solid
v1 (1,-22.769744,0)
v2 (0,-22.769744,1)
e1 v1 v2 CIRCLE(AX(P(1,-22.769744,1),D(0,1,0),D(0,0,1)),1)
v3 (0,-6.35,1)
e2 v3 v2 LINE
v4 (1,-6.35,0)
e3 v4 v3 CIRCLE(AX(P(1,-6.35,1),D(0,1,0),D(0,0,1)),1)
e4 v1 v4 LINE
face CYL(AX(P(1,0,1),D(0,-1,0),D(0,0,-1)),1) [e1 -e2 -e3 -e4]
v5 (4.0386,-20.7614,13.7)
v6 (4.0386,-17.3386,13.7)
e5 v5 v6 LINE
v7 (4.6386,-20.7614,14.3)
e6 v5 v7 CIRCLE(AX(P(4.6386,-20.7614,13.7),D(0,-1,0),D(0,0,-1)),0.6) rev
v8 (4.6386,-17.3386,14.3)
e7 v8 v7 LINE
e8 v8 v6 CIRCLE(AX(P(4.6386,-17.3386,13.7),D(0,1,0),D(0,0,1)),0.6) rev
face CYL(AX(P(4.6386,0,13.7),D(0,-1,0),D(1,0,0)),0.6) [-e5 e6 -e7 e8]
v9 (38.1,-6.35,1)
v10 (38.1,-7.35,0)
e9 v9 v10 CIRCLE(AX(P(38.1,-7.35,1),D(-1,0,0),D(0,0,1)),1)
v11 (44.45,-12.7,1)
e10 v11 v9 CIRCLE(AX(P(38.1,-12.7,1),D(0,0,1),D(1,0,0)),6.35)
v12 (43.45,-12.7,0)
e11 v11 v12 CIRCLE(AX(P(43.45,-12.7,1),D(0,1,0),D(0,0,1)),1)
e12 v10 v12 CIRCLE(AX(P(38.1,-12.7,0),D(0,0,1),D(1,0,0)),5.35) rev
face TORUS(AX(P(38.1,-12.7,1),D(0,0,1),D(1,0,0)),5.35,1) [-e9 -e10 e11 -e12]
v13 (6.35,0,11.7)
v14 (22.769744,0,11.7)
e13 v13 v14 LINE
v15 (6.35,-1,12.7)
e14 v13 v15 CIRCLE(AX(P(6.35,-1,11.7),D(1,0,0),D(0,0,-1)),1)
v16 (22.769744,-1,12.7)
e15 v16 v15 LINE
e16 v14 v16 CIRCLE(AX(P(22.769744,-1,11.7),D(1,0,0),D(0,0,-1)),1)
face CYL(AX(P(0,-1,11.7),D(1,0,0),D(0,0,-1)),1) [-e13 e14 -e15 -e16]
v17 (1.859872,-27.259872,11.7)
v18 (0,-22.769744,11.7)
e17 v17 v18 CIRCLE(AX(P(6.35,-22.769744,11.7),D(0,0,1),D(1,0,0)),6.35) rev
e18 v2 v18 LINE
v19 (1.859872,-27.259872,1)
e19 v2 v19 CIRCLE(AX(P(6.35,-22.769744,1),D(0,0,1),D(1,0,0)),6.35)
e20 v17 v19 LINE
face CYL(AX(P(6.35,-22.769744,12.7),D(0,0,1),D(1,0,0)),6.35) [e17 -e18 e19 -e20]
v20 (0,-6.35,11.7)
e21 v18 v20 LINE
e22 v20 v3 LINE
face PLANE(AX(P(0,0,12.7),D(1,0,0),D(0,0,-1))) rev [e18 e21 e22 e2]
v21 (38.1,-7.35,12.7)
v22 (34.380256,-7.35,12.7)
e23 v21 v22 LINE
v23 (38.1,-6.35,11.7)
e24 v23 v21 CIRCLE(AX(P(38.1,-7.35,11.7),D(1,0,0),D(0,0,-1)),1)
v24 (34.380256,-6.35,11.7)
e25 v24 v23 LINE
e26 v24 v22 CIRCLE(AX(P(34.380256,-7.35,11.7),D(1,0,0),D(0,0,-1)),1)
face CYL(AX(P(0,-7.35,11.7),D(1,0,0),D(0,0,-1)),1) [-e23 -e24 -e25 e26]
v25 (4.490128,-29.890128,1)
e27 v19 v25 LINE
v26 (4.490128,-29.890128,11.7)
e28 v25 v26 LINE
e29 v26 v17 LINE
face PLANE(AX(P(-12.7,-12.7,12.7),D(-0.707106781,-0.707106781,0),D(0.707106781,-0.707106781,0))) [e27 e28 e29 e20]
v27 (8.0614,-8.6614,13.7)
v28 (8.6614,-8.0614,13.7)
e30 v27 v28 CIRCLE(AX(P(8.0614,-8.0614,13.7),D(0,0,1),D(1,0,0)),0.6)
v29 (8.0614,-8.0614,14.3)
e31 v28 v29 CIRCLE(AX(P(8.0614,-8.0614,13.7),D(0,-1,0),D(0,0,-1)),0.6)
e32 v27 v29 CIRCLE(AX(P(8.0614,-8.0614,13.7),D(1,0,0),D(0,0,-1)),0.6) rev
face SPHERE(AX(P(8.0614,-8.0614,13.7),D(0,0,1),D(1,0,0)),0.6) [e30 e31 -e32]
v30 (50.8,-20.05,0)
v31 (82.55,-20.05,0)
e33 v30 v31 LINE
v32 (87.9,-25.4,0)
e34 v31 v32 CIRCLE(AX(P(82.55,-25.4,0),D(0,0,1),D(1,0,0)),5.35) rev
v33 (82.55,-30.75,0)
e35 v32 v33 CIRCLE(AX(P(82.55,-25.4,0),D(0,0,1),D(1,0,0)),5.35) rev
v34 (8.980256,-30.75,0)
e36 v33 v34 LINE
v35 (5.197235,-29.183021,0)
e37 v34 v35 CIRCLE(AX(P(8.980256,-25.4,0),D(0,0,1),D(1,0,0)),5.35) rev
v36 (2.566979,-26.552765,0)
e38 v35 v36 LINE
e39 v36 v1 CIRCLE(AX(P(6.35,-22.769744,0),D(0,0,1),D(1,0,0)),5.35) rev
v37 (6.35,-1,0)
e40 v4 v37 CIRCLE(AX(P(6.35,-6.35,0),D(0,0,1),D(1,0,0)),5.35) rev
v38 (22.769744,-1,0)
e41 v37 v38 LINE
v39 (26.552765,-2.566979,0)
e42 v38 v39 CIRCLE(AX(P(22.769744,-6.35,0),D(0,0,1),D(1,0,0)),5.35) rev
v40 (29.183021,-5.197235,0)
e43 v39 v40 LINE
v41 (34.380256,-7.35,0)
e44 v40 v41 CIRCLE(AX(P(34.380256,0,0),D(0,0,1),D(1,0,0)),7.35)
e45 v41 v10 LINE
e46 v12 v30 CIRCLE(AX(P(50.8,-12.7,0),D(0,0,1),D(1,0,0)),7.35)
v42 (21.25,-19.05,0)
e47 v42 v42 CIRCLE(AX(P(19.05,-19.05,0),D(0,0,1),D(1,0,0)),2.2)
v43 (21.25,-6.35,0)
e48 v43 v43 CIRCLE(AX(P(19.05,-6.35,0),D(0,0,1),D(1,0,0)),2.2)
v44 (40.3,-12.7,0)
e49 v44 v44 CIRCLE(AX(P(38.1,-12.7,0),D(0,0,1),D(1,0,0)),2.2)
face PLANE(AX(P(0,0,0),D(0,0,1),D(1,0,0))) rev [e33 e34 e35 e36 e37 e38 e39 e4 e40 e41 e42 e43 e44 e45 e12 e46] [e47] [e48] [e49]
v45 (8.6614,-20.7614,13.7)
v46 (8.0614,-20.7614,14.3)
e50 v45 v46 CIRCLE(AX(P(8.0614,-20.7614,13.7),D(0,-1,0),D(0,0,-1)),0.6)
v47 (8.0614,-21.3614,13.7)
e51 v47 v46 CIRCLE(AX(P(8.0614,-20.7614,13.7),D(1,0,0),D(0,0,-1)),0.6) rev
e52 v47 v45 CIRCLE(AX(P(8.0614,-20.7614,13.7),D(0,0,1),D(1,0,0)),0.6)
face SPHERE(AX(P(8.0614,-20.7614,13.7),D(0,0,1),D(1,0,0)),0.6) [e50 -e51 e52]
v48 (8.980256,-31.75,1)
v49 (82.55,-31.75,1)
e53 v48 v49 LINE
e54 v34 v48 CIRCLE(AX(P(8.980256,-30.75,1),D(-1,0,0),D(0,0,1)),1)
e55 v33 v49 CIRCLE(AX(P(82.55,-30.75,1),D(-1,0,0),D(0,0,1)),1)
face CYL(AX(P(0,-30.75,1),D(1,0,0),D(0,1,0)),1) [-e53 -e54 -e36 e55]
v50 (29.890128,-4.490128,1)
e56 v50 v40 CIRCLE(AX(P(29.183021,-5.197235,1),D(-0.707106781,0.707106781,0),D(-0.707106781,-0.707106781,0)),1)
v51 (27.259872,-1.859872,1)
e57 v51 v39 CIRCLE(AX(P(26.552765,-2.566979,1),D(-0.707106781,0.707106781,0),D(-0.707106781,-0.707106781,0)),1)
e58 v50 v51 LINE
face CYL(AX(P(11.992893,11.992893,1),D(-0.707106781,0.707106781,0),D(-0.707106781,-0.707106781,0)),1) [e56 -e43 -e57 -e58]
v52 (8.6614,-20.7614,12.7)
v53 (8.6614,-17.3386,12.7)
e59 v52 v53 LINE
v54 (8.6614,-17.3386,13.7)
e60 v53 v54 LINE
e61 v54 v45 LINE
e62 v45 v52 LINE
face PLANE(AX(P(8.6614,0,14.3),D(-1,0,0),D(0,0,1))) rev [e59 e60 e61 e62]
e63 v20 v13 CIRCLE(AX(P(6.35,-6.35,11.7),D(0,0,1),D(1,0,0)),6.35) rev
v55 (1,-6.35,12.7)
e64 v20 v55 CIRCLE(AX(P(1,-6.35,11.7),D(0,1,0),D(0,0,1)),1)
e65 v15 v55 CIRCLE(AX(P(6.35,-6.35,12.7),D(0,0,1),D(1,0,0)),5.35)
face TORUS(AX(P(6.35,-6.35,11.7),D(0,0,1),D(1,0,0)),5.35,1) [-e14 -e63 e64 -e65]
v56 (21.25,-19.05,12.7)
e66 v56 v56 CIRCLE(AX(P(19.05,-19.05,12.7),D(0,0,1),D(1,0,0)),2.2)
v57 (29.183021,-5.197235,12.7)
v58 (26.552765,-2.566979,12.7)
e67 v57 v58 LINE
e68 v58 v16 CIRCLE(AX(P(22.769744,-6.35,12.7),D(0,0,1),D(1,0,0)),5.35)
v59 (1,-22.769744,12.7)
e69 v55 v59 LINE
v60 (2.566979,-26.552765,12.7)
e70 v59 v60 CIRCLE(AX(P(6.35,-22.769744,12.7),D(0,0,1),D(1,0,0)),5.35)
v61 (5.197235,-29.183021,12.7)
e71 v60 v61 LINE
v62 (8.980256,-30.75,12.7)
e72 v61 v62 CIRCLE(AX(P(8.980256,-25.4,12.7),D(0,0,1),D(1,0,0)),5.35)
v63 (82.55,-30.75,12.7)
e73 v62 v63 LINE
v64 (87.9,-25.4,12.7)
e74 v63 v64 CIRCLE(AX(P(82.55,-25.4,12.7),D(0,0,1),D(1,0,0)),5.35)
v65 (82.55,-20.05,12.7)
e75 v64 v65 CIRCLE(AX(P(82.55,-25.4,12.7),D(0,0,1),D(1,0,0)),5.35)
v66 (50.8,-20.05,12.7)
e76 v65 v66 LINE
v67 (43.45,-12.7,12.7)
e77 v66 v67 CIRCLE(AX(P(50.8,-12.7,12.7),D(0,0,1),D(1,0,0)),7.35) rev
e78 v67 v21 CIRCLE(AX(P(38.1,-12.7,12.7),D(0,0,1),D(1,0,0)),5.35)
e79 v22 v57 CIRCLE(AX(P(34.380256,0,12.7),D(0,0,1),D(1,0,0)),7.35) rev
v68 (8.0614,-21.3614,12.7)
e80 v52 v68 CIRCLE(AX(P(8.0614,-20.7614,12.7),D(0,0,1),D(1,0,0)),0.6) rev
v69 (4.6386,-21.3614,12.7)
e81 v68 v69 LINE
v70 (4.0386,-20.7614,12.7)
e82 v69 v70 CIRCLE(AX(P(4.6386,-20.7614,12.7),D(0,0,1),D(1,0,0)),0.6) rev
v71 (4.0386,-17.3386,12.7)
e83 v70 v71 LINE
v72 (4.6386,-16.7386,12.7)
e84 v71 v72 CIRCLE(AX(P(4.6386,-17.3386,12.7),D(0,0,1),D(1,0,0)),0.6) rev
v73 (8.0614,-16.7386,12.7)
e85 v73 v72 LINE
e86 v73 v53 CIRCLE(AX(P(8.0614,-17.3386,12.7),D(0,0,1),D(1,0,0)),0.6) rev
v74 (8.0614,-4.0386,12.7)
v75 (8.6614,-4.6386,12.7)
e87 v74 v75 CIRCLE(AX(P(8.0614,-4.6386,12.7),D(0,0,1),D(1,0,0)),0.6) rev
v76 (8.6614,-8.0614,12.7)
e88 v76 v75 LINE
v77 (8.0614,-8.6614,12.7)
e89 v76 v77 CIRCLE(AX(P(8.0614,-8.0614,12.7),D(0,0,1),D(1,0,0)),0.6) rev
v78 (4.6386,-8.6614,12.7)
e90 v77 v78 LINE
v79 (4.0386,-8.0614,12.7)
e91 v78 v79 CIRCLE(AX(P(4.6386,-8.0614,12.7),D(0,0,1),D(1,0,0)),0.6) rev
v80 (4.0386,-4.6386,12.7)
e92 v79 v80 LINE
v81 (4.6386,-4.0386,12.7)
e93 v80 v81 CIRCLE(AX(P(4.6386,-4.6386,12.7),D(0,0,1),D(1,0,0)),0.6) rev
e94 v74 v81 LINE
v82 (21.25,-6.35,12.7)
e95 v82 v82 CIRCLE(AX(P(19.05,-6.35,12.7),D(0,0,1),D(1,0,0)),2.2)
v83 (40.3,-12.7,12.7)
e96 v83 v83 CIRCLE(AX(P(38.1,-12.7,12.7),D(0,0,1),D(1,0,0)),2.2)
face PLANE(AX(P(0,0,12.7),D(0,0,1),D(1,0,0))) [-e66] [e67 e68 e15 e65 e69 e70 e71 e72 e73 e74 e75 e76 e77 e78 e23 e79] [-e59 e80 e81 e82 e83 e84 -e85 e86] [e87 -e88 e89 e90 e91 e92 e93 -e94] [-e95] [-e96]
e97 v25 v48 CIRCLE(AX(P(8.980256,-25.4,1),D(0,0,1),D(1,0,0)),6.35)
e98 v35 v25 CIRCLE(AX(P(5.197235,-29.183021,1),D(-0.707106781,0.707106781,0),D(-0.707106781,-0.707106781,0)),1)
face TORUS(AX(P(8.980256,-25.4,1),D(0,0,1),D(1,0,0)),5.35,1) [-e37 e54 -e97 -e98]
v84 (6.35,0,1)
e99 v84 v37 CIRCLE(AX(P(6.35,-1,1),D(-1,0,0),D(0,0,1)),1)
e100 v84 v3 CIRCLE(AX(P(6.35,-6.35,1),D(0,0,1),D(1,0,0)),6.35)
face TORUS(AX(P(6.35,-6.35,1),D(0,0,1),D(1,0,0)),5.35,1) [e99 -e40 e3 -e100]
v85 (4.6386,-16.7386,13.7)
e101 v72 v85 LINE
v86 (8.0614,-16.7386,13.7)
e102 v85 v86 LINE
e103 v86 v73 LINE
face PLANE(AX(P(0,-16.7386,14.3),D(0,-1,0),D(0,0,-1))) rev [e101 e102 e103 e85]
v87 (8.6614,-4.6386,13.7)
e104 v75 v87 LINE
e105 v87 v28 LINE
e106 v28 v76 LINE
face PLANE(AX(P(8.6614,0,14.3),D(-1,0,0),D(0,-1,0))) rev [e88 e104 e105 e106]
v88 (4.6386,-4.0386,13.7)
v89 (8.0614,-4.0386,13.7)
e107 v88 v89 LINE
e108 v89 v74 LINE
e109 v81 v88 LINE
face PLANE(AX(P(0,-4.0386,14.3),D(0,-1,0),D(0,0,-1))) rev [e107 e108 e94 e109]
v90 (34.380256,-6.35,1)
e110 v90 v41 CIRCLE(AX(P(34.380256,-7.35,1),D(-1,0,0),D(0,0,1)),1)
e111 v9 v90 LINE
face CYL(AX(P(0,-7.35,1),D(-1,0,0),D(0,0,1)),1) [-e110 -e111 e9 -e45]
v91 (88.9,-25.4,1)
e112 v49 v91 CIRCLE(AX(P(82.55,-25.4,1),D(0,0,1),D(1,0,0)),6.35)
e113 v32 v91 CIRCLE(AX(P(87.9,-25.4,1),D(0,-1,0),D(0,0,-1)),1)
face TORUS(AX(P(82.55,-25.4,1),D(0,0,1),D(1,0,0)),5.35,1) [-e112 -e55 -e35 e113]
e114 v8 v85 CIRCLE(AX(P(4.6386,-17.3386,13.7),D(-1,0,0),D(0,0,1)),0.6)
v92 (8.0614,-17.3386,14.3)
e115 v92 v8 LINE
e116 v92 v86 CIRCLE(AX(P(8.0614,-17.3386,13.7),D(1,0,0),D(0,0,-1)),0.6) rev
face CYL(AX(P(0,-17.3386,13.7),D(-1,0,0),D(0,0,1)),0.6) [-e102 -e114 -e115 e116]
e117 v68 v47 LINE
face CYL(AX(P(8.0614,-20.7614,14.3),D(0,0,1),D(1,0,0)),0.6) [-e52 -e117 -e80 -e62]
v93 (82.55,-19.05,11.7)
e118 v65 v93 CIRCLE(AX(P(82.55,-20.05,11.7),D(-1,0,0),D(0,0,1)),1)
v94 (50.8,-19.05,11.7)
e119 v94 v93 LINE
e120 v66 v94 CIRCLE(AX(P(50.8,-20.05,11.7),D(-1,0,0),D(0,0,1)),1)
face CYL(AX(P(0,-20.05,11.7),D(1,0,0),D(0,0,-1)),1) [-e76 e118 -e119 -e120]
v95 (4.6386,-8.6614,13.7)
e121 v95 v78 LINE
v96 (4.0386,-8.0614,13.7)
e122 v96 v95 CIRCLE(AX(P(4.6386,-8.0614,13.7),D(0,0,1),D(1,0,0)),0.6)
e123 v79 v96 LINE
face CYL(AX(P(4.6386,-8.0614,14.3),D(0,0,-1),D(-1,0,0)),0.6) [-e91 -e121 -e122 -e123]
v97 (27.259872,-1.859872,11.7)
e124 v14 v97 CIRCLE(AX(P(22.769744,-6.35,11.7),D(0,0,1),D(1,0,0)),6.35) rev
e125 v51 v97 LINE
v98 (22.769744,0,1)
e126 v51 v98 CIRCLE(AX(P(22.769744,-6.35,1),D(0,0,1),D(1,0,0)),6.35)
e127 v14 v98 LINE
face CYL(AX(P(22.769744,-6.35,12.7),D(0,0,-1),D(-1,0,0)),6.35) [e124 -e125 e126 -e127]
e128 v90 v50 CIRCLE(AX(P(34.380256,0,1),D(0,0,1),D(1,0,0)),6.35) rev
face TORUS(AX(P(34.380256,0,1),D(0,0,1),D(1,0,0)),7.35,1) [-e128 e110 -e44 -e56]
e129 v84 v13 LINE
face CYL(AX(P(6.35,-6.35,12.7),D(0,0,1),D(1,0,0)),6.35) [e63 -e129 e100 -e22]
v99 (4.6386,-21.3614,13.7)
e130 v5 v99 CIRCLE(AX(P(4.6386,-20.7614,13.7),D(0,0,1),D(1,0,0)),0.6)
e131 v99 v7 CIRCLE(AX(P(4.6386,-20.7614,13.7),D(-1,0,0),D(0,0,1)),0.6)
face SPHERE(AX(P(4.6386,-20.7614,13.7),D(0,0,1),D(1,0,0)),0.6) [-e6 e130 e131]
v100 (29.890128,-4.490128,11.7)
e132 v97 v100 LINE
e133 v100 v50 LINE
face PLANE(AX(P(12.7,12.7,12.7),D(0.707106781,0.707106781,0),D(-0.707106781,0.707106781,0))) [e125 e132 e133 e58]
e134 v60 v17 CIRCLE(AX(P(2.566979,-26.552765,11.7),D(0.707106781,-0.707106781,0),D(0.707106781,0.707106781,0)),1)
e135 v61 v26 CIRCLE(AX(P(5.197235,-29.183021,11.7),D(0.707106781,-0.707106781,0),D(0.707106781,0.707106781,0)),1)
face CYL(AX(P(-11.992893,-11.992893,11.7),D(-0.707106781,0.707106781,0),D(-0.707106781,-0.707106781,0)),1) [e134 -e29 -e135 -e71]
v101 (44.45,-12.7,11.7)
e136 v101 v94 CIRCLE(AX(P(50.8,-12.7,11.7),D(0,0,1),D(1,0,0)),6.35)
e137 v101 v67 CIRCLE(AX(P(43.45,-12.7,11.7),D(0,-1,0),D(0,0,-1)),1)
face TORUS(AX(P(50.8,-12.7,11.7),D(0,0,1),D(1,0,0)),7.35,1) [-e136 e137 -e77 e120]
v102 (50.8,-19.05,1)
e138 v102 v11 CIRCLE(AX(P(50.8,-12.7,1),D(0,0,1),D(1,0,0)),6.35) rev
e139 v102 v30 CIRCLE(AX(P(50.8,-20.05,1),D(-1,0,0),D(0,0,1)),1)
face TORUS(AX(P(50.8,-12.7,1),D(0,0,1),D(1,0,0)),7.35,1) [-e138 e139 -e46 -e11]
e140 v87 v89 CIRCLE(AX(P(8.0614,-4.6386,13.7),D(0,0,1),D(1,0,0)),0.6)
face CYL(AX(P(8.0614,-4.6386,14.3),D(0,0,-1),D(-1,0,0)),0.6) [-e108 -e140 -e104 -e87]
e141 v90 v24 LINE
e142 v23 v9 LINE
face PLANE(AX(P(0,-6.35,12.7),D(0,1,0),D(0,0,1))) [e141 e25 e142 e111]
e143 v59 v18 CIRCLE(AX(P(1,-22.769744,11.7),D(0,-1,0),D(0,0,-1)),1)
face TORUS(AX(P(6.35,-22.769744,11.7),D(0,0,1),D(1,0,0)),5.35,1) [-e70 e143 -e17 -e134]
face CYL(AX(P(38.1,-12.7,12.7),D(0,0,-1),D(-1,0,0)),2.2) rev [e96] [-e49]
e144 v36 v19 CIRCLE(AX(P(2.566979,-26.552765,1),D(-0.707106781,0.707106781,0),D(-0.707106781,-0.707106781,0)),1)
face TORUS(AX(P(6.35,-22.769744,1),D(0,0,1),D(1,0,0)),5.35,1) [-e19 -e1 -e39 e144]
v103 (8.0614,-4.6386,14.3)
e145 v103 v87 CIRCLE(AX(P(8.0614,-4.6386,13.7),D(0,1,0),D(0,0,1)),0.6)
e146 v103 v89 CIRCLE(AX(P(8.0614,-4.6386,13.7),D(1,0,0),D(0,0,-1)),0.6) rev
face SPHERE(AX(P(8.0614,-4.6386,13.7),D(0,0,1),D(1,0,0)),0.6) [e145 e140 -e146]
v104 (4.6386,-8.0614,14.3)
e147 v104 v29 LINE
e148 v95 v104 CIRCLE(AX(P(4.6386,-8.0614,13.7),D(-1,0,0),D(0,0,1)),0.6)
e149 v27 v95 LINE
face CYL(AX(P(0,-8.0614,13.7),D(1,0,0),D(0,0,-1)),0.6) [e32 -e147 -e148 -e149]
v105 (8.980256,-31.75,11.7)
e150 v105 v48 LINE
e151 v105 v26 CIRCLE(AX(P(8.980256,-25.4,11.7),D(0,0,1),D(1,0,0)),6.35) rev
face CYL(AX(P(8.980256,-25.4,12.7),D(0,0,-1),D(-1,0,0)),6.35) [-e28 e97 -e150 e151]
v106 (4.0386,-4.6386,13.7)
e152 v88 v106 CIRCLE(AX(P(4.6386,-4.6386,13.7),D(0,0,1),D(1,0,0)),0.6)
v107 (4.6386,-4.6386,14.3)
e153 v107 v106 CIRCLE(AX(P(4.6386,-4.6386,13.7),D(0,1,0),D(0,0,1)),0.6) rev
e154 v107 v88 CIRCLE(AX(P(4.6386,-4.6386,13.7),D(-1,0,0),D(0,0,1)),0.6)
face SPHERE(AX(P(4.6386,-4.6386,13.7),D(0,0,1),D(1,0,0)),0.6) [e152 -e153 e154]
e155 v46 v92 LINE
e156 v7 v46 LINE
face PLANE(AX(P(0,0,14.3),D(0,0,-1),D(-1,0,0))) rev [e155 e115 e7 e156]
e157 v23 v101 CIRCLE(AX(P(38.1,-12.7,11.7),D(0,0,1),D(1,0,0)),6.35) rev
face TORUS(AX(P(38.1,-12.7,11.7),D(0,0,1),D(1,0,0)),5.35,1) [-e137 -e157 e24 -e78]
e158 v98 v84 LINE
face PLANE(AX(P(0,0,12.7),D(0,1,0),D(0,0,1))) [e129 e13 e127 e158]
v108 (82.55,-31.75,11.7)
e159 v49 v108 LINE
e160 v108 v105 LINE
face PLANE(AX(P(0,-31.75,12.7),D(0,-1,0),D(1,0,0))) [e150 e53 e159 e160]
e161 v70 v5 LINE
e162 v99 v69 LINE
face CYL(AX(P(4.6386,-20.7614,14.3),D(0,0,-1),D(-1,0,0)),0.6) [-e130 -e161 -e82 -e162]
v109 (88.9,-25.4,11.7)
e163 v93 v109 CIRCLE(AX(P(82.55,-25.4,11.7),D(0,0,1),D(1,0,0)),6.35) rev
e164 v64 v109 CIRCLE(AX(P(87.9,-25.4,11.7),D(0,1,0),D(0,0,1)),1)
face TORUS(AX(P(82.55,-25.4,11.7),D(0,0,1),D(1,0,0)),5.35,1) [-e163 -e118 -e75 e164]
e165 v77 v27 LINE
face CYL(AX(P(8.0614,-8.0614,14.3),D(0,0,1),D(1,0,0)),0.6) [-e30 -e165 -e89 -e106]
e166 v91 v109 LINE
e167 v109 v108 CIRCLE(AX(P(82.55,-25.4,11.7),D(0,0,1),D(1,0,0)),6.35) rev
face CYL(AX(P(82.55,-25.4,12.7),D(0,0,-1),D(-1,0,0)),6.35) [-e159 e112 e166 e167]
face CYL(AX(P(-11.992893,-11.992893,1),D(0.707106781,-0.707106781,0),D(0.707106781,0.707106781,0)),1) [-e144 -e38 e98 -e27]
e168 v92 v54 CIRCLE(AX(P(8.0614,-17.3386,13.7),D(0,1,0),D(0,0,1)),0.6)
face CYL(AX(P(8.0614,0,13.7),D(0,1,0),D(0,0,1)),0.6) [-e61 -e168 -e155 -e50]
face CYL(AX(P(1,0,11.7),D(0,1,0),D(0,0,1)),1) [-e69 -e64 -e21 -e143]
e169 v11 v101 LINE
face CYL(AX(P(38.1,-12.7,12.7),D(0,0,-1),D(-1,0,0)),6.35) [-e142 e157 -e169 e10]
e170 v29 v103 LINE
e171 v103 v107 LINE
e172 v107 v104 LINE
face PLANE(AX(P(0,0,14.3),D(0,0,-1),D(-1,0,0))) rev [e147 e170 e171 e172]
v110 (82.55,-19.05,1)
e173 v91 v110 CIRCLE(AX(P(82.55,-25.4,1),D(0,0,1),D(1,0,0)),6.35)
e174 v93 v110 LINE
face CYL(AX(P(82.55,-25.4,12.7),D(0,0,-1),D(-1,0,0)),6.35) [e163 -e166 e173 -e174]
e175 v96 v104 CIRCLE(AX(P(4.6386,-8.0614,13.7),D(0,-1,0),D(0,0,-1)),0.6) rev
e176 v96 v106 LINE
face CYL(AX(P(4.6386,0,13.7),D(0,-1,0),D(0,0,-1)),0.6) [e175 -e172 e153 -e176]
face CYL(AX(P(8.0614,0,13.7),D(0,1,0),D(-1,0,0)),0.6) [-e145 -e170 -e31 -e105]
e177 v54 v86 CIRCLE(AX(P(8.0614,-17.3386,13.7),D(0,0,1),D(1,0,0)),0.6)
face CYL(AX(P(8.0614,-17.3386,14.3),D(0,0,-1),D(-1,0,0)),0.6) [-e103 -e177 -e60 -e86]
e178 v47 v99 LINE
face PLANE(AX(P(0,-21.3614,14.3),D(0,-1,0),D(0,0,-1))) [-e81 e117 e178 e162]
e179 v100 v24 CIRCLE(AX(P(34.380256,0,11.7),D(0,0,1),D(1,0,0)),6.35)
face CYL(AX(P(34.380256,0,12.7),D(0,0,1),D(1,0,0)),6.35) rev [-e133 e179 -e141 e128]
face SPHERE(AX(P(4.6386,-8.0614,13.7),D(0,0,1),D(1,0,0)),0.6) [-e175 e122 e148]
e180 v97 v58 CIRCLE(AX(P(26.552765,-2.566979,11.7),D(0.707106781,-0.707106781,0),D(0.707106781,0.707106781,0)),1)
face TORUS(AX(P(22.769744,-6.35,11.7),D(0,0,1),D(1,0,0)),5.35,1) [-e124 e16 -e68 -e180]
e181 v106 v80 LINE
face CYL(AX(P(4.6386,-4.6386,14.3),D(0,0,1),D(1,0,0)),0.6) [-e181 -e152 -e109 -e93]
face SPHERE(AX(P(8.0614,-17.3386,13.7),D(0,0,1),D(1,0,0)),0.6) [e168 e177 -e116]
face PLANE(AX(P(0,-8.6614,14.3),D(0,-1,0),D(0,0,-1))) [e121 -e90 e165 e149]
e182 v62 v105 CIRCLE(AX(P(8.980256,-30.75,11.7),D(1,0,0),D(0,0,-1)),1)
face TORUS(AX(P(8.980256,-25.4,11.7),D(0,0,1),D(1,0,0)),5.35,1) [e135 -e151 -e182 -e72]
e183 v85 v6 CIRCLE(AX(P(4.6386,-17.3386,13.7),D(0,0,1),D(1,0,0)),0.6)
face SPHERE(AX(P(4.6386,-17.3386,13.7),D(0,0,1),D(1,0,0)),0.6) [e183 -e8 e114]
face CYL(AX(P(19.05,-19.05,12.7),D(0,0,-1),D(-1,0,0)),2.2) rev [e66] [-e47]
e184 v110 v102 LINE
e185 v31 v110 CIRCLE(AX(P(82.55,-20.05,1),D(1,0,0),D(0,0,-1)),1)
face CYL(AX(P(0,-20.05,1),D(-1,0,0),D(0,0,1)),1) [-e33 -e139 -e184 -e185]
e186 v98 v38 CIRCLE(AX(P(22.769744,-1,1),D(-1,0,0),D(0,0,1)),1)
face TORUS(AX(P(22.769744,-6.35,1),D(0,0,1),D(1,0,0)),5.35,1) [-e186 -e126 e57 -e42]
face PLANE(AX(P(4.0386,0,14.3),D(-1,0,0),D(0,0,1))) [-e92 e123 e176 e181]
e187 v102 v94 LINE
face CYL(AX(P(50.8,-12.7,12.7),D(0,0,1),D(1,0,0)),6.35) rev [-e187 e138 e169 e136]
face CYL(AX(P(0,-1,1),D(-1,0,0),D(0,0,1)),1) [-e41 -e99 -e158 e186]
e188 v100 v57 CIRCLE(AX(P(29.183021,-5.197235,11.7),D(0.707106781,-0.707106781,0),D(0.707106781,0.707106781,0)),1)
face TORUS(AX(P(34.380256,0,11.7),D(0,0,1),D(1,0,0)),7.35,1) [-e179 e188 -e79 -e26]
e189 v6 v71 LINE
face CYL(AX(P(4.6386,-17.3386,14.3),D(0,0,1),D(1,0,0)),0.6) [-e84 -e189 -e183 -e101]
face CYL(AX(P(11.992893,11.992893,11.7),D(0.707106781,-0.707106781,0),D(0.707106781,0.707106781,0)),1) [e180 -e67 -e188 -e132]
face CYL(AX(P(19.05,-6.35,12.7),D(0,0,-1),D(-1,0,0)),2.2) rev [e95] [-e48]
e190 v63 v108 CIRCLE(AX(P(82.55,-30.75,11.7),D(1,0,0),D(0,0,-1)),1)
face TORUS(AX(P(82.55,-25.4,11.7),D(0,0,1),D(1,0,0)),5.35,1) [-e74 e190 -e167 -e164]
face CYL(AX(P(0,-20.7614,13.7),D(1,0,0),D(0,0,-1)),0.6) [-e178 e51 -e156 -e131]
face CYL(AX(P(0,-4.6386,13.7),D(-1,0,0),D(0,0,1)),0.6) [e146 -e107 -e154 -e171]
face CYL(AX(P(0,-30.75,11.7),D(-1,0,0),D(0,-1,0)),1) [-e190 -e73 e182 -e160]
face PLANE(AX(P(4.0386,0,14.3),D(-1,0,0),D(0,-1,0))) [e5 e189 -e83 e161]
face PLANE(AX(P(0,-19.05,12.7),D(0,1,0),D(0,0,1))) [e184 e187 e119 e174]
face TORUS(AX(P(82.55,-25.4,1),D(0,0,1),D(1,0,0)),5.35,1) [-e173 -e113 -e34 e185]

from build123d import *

# Parameters (mm, degrees)
SKETCH1_R           = 2.2
SKETCH1_W           = 25.4
SKETCH1_H           = 25.4
SKETCH1_W_2         = 4.6228
SKETCH1_H_2         = 4.6228
SKETCH1_W_3         = 12.7
SKETCH1_H_3         = 12.7
BOSS_EXTRUDE1_DEPTH = 12.7
BOSS_EXTRUDE2_START = 12.7
SKETCH1_3_W         = 4.6228
SKETCH1_3_H         = 4.6228
BOSS_EXTRUDE2_DEPTH = 1.6
FILLET1_R           = 6.35
FILLET2_R           = 0.6
FILLET3_R           = 1


with BuildPart() as part:
    # Sketch1 → Boss-Extrude1 (new body)
    # profile 1 of 5: a face of its own
    with BuildSketch(Plane.XY):
        Polygon((6.35, -31.75), (0, -25.4), (25.4, -25.4), (25.4, 0), (31.75, -6.35), (44.45, -6.35), (44.45, -19.05), (76.2, -19.05), (76.2, -31.75), align=None)
        with Locations((38.1, -12.7)):
            Circle(SKETCH1_R, mode=Mode.SUBTRACT)
    # profile 2 of 5: a face of its own
    with BuildSketch(Plane.XY):
        with Locations((12.7, -12.7)):
            Rectangle(SKETCH1_W, SKETCH1_H)
        with Locations((19.05, -19.05)):
            Circle(SKETCH1_R, mode=Mode.SUBTRACT)
        with Locations((19.05, -6.35)):
            Circle(SKETCH1_R, mode=Mode.SUBTRACT)
        with Locations((6.35, -6.35)):
            Rectangle(SKETCH1_W_2, SKETCH1_H_2, mode=Mode.SUBTRACT)
        with Locations((6.35, -19.05)):
            Rectangle(SKETCH1_W_2, SKETCH1_H_2, mode=Mode.SUBTRACT)
    # profile 3 of 5: a face of its own
    with BuildSketch(Plane.XY):
        with Locations((6.35, -19.05)):
            Rectangle(SKETCH1_W_2, SKETCH1_H_2)
    # profile 4 of 5: a face of its own
    with BuildSketch(Plane.XY):
        with Locations((6.35, -6.35)):
            Rectangle(SKETCH1_W_2, SKETCH1_H_2)
    # profile 5 of 5: a face of its own
    with BuildSketch(Plane.XY):
        with Locations((82.55, -25.4)):
            Rectangle(SKETCH1_W_3, SKETCH1_H_3)
    extrude(amount=BOSS_EXTRUDE1_DEPTH)

    # Sketch1<3> → Boss-Extrude2 (add)
    with BuildSketch(Plane.XY.offset(BOSS_EXTRUDE2_START)):
        with Locations((6.35, -6.35)):
            Rectangle(SKETCH1_3_W, SKETCH1_3_H)
        with Locations((6.35, -19.05)):
            Rectangle(SKETCH1_3_W, SKETCH1_3_H)
    extrude(amount=BOSS_EXTRUDE2_DEPTH)

    # Fillet1
    fillet1_edges = [part.edges().sort_by_distance(p)[0] for p in [
        (88.9, -31.75, 6.35),
        (88.9, -19.05, 6.35),
        (44.45, -19.05, 6.35),
        (44.45, -6.35, 6.35),
        (31.75, -6.35, 6.35),
        (25.4, 0, 6.35),
        (6.35, -31.75, 6.35),
        (0, -25.4, 6.35),
        (0, 0, 6.35),
    ]]
    fillet(fillet1_edges, radius=FILLET1_R - 0.0001)  # a hair under: the kernel refuses the full size

    # Fillet2
    fillet2_edges = [part.edges().sort_by_distance(p)[0] for p in [
        (6.35, -8.6614, 14.3),
        (4.0386, -8.6614, 13.5),
        (8.6614, -8.6614, 13.5),
        (8.6614, -4.0386, 13.5),
        (4.0386, -6.35, 14.3),
        (4.0386, -4.0386, 13.5),
        (8.6614, -6.35, 14.3),
        (6.35, -4.0386, 14.3),
        (6.35, -21.3614, 14.3),
        (4.0386, -21.3614, 13.5),
        (8.6614, -21.3614, 13.5),
        (8.6614, -16.7386, 13.5),
        (4.0386, -19.05, 14.3),
        (4.0386, -16.7386, 13.5),
        (8.6614, -19.05, 14.3),
        (6.35, -16.7386, 14.3),
    ]]
    fillet(fillet2_edges, radius=FILLET2_R)

    # Fillet3
    fillet3_edges = [part.edges().sort_by_distance(p)[0] for p in [
        (3.175, -28.575, 0),
        (0, -14.55984265, 0),
        (14.55984265, 0, 0),
        (28.575, -3.175, 0),
        (36.24015735, -6.35, 0),
        (66.675, -19.05, 0),
        (45.76515735, -31.75, 0),
        (1.85984265, -1.85984265, 0),
        (0.483357357, -25.199786827, 0),
        (6.550213173, -31.266642643, 0),
        (25.199786827, -0.483357357, 0),
        (42.59015735, -8.20984265, 0),
        (87.04015735, -20.90984265, 0),
        (87.04015735, -29.89015735, 0),
        (45.76515735, -31.75, 12.7),
        (3.175, -28.575, 12.7),
        (66.675, -19.05, 12.7),
        (36.24015735, -6.35, 12.7),
        (28.575, -3.175, 12.7),
        (14.55984265, 0, 12.7),
        (0, -14.55984265, 12.7),
        (1.85984265, -1.85984265, 12.7),
        (0.483357357, -25.199786827, 12.7),
        (6.550213173, -31.266642643, 12.7),
        (25.199786827, -0.483357357, 12.7),
        (42.59015735, -8.20984265, 12.7),
        (87.04015735, -20.90984265, 12.7),
        (87.04015735, -29.89015735, 12.7),
        (46.30984265, -17.19015735, 0),
        (46.30984265, -17.19015735, 12.7),
        (31.950213173, -5.866642643, 0),
        (31.950213173, -5.866642643, 12.7),
    ]]
    fillet(fillet3_edges, radius=FILLET3_R)


solid = part.part
